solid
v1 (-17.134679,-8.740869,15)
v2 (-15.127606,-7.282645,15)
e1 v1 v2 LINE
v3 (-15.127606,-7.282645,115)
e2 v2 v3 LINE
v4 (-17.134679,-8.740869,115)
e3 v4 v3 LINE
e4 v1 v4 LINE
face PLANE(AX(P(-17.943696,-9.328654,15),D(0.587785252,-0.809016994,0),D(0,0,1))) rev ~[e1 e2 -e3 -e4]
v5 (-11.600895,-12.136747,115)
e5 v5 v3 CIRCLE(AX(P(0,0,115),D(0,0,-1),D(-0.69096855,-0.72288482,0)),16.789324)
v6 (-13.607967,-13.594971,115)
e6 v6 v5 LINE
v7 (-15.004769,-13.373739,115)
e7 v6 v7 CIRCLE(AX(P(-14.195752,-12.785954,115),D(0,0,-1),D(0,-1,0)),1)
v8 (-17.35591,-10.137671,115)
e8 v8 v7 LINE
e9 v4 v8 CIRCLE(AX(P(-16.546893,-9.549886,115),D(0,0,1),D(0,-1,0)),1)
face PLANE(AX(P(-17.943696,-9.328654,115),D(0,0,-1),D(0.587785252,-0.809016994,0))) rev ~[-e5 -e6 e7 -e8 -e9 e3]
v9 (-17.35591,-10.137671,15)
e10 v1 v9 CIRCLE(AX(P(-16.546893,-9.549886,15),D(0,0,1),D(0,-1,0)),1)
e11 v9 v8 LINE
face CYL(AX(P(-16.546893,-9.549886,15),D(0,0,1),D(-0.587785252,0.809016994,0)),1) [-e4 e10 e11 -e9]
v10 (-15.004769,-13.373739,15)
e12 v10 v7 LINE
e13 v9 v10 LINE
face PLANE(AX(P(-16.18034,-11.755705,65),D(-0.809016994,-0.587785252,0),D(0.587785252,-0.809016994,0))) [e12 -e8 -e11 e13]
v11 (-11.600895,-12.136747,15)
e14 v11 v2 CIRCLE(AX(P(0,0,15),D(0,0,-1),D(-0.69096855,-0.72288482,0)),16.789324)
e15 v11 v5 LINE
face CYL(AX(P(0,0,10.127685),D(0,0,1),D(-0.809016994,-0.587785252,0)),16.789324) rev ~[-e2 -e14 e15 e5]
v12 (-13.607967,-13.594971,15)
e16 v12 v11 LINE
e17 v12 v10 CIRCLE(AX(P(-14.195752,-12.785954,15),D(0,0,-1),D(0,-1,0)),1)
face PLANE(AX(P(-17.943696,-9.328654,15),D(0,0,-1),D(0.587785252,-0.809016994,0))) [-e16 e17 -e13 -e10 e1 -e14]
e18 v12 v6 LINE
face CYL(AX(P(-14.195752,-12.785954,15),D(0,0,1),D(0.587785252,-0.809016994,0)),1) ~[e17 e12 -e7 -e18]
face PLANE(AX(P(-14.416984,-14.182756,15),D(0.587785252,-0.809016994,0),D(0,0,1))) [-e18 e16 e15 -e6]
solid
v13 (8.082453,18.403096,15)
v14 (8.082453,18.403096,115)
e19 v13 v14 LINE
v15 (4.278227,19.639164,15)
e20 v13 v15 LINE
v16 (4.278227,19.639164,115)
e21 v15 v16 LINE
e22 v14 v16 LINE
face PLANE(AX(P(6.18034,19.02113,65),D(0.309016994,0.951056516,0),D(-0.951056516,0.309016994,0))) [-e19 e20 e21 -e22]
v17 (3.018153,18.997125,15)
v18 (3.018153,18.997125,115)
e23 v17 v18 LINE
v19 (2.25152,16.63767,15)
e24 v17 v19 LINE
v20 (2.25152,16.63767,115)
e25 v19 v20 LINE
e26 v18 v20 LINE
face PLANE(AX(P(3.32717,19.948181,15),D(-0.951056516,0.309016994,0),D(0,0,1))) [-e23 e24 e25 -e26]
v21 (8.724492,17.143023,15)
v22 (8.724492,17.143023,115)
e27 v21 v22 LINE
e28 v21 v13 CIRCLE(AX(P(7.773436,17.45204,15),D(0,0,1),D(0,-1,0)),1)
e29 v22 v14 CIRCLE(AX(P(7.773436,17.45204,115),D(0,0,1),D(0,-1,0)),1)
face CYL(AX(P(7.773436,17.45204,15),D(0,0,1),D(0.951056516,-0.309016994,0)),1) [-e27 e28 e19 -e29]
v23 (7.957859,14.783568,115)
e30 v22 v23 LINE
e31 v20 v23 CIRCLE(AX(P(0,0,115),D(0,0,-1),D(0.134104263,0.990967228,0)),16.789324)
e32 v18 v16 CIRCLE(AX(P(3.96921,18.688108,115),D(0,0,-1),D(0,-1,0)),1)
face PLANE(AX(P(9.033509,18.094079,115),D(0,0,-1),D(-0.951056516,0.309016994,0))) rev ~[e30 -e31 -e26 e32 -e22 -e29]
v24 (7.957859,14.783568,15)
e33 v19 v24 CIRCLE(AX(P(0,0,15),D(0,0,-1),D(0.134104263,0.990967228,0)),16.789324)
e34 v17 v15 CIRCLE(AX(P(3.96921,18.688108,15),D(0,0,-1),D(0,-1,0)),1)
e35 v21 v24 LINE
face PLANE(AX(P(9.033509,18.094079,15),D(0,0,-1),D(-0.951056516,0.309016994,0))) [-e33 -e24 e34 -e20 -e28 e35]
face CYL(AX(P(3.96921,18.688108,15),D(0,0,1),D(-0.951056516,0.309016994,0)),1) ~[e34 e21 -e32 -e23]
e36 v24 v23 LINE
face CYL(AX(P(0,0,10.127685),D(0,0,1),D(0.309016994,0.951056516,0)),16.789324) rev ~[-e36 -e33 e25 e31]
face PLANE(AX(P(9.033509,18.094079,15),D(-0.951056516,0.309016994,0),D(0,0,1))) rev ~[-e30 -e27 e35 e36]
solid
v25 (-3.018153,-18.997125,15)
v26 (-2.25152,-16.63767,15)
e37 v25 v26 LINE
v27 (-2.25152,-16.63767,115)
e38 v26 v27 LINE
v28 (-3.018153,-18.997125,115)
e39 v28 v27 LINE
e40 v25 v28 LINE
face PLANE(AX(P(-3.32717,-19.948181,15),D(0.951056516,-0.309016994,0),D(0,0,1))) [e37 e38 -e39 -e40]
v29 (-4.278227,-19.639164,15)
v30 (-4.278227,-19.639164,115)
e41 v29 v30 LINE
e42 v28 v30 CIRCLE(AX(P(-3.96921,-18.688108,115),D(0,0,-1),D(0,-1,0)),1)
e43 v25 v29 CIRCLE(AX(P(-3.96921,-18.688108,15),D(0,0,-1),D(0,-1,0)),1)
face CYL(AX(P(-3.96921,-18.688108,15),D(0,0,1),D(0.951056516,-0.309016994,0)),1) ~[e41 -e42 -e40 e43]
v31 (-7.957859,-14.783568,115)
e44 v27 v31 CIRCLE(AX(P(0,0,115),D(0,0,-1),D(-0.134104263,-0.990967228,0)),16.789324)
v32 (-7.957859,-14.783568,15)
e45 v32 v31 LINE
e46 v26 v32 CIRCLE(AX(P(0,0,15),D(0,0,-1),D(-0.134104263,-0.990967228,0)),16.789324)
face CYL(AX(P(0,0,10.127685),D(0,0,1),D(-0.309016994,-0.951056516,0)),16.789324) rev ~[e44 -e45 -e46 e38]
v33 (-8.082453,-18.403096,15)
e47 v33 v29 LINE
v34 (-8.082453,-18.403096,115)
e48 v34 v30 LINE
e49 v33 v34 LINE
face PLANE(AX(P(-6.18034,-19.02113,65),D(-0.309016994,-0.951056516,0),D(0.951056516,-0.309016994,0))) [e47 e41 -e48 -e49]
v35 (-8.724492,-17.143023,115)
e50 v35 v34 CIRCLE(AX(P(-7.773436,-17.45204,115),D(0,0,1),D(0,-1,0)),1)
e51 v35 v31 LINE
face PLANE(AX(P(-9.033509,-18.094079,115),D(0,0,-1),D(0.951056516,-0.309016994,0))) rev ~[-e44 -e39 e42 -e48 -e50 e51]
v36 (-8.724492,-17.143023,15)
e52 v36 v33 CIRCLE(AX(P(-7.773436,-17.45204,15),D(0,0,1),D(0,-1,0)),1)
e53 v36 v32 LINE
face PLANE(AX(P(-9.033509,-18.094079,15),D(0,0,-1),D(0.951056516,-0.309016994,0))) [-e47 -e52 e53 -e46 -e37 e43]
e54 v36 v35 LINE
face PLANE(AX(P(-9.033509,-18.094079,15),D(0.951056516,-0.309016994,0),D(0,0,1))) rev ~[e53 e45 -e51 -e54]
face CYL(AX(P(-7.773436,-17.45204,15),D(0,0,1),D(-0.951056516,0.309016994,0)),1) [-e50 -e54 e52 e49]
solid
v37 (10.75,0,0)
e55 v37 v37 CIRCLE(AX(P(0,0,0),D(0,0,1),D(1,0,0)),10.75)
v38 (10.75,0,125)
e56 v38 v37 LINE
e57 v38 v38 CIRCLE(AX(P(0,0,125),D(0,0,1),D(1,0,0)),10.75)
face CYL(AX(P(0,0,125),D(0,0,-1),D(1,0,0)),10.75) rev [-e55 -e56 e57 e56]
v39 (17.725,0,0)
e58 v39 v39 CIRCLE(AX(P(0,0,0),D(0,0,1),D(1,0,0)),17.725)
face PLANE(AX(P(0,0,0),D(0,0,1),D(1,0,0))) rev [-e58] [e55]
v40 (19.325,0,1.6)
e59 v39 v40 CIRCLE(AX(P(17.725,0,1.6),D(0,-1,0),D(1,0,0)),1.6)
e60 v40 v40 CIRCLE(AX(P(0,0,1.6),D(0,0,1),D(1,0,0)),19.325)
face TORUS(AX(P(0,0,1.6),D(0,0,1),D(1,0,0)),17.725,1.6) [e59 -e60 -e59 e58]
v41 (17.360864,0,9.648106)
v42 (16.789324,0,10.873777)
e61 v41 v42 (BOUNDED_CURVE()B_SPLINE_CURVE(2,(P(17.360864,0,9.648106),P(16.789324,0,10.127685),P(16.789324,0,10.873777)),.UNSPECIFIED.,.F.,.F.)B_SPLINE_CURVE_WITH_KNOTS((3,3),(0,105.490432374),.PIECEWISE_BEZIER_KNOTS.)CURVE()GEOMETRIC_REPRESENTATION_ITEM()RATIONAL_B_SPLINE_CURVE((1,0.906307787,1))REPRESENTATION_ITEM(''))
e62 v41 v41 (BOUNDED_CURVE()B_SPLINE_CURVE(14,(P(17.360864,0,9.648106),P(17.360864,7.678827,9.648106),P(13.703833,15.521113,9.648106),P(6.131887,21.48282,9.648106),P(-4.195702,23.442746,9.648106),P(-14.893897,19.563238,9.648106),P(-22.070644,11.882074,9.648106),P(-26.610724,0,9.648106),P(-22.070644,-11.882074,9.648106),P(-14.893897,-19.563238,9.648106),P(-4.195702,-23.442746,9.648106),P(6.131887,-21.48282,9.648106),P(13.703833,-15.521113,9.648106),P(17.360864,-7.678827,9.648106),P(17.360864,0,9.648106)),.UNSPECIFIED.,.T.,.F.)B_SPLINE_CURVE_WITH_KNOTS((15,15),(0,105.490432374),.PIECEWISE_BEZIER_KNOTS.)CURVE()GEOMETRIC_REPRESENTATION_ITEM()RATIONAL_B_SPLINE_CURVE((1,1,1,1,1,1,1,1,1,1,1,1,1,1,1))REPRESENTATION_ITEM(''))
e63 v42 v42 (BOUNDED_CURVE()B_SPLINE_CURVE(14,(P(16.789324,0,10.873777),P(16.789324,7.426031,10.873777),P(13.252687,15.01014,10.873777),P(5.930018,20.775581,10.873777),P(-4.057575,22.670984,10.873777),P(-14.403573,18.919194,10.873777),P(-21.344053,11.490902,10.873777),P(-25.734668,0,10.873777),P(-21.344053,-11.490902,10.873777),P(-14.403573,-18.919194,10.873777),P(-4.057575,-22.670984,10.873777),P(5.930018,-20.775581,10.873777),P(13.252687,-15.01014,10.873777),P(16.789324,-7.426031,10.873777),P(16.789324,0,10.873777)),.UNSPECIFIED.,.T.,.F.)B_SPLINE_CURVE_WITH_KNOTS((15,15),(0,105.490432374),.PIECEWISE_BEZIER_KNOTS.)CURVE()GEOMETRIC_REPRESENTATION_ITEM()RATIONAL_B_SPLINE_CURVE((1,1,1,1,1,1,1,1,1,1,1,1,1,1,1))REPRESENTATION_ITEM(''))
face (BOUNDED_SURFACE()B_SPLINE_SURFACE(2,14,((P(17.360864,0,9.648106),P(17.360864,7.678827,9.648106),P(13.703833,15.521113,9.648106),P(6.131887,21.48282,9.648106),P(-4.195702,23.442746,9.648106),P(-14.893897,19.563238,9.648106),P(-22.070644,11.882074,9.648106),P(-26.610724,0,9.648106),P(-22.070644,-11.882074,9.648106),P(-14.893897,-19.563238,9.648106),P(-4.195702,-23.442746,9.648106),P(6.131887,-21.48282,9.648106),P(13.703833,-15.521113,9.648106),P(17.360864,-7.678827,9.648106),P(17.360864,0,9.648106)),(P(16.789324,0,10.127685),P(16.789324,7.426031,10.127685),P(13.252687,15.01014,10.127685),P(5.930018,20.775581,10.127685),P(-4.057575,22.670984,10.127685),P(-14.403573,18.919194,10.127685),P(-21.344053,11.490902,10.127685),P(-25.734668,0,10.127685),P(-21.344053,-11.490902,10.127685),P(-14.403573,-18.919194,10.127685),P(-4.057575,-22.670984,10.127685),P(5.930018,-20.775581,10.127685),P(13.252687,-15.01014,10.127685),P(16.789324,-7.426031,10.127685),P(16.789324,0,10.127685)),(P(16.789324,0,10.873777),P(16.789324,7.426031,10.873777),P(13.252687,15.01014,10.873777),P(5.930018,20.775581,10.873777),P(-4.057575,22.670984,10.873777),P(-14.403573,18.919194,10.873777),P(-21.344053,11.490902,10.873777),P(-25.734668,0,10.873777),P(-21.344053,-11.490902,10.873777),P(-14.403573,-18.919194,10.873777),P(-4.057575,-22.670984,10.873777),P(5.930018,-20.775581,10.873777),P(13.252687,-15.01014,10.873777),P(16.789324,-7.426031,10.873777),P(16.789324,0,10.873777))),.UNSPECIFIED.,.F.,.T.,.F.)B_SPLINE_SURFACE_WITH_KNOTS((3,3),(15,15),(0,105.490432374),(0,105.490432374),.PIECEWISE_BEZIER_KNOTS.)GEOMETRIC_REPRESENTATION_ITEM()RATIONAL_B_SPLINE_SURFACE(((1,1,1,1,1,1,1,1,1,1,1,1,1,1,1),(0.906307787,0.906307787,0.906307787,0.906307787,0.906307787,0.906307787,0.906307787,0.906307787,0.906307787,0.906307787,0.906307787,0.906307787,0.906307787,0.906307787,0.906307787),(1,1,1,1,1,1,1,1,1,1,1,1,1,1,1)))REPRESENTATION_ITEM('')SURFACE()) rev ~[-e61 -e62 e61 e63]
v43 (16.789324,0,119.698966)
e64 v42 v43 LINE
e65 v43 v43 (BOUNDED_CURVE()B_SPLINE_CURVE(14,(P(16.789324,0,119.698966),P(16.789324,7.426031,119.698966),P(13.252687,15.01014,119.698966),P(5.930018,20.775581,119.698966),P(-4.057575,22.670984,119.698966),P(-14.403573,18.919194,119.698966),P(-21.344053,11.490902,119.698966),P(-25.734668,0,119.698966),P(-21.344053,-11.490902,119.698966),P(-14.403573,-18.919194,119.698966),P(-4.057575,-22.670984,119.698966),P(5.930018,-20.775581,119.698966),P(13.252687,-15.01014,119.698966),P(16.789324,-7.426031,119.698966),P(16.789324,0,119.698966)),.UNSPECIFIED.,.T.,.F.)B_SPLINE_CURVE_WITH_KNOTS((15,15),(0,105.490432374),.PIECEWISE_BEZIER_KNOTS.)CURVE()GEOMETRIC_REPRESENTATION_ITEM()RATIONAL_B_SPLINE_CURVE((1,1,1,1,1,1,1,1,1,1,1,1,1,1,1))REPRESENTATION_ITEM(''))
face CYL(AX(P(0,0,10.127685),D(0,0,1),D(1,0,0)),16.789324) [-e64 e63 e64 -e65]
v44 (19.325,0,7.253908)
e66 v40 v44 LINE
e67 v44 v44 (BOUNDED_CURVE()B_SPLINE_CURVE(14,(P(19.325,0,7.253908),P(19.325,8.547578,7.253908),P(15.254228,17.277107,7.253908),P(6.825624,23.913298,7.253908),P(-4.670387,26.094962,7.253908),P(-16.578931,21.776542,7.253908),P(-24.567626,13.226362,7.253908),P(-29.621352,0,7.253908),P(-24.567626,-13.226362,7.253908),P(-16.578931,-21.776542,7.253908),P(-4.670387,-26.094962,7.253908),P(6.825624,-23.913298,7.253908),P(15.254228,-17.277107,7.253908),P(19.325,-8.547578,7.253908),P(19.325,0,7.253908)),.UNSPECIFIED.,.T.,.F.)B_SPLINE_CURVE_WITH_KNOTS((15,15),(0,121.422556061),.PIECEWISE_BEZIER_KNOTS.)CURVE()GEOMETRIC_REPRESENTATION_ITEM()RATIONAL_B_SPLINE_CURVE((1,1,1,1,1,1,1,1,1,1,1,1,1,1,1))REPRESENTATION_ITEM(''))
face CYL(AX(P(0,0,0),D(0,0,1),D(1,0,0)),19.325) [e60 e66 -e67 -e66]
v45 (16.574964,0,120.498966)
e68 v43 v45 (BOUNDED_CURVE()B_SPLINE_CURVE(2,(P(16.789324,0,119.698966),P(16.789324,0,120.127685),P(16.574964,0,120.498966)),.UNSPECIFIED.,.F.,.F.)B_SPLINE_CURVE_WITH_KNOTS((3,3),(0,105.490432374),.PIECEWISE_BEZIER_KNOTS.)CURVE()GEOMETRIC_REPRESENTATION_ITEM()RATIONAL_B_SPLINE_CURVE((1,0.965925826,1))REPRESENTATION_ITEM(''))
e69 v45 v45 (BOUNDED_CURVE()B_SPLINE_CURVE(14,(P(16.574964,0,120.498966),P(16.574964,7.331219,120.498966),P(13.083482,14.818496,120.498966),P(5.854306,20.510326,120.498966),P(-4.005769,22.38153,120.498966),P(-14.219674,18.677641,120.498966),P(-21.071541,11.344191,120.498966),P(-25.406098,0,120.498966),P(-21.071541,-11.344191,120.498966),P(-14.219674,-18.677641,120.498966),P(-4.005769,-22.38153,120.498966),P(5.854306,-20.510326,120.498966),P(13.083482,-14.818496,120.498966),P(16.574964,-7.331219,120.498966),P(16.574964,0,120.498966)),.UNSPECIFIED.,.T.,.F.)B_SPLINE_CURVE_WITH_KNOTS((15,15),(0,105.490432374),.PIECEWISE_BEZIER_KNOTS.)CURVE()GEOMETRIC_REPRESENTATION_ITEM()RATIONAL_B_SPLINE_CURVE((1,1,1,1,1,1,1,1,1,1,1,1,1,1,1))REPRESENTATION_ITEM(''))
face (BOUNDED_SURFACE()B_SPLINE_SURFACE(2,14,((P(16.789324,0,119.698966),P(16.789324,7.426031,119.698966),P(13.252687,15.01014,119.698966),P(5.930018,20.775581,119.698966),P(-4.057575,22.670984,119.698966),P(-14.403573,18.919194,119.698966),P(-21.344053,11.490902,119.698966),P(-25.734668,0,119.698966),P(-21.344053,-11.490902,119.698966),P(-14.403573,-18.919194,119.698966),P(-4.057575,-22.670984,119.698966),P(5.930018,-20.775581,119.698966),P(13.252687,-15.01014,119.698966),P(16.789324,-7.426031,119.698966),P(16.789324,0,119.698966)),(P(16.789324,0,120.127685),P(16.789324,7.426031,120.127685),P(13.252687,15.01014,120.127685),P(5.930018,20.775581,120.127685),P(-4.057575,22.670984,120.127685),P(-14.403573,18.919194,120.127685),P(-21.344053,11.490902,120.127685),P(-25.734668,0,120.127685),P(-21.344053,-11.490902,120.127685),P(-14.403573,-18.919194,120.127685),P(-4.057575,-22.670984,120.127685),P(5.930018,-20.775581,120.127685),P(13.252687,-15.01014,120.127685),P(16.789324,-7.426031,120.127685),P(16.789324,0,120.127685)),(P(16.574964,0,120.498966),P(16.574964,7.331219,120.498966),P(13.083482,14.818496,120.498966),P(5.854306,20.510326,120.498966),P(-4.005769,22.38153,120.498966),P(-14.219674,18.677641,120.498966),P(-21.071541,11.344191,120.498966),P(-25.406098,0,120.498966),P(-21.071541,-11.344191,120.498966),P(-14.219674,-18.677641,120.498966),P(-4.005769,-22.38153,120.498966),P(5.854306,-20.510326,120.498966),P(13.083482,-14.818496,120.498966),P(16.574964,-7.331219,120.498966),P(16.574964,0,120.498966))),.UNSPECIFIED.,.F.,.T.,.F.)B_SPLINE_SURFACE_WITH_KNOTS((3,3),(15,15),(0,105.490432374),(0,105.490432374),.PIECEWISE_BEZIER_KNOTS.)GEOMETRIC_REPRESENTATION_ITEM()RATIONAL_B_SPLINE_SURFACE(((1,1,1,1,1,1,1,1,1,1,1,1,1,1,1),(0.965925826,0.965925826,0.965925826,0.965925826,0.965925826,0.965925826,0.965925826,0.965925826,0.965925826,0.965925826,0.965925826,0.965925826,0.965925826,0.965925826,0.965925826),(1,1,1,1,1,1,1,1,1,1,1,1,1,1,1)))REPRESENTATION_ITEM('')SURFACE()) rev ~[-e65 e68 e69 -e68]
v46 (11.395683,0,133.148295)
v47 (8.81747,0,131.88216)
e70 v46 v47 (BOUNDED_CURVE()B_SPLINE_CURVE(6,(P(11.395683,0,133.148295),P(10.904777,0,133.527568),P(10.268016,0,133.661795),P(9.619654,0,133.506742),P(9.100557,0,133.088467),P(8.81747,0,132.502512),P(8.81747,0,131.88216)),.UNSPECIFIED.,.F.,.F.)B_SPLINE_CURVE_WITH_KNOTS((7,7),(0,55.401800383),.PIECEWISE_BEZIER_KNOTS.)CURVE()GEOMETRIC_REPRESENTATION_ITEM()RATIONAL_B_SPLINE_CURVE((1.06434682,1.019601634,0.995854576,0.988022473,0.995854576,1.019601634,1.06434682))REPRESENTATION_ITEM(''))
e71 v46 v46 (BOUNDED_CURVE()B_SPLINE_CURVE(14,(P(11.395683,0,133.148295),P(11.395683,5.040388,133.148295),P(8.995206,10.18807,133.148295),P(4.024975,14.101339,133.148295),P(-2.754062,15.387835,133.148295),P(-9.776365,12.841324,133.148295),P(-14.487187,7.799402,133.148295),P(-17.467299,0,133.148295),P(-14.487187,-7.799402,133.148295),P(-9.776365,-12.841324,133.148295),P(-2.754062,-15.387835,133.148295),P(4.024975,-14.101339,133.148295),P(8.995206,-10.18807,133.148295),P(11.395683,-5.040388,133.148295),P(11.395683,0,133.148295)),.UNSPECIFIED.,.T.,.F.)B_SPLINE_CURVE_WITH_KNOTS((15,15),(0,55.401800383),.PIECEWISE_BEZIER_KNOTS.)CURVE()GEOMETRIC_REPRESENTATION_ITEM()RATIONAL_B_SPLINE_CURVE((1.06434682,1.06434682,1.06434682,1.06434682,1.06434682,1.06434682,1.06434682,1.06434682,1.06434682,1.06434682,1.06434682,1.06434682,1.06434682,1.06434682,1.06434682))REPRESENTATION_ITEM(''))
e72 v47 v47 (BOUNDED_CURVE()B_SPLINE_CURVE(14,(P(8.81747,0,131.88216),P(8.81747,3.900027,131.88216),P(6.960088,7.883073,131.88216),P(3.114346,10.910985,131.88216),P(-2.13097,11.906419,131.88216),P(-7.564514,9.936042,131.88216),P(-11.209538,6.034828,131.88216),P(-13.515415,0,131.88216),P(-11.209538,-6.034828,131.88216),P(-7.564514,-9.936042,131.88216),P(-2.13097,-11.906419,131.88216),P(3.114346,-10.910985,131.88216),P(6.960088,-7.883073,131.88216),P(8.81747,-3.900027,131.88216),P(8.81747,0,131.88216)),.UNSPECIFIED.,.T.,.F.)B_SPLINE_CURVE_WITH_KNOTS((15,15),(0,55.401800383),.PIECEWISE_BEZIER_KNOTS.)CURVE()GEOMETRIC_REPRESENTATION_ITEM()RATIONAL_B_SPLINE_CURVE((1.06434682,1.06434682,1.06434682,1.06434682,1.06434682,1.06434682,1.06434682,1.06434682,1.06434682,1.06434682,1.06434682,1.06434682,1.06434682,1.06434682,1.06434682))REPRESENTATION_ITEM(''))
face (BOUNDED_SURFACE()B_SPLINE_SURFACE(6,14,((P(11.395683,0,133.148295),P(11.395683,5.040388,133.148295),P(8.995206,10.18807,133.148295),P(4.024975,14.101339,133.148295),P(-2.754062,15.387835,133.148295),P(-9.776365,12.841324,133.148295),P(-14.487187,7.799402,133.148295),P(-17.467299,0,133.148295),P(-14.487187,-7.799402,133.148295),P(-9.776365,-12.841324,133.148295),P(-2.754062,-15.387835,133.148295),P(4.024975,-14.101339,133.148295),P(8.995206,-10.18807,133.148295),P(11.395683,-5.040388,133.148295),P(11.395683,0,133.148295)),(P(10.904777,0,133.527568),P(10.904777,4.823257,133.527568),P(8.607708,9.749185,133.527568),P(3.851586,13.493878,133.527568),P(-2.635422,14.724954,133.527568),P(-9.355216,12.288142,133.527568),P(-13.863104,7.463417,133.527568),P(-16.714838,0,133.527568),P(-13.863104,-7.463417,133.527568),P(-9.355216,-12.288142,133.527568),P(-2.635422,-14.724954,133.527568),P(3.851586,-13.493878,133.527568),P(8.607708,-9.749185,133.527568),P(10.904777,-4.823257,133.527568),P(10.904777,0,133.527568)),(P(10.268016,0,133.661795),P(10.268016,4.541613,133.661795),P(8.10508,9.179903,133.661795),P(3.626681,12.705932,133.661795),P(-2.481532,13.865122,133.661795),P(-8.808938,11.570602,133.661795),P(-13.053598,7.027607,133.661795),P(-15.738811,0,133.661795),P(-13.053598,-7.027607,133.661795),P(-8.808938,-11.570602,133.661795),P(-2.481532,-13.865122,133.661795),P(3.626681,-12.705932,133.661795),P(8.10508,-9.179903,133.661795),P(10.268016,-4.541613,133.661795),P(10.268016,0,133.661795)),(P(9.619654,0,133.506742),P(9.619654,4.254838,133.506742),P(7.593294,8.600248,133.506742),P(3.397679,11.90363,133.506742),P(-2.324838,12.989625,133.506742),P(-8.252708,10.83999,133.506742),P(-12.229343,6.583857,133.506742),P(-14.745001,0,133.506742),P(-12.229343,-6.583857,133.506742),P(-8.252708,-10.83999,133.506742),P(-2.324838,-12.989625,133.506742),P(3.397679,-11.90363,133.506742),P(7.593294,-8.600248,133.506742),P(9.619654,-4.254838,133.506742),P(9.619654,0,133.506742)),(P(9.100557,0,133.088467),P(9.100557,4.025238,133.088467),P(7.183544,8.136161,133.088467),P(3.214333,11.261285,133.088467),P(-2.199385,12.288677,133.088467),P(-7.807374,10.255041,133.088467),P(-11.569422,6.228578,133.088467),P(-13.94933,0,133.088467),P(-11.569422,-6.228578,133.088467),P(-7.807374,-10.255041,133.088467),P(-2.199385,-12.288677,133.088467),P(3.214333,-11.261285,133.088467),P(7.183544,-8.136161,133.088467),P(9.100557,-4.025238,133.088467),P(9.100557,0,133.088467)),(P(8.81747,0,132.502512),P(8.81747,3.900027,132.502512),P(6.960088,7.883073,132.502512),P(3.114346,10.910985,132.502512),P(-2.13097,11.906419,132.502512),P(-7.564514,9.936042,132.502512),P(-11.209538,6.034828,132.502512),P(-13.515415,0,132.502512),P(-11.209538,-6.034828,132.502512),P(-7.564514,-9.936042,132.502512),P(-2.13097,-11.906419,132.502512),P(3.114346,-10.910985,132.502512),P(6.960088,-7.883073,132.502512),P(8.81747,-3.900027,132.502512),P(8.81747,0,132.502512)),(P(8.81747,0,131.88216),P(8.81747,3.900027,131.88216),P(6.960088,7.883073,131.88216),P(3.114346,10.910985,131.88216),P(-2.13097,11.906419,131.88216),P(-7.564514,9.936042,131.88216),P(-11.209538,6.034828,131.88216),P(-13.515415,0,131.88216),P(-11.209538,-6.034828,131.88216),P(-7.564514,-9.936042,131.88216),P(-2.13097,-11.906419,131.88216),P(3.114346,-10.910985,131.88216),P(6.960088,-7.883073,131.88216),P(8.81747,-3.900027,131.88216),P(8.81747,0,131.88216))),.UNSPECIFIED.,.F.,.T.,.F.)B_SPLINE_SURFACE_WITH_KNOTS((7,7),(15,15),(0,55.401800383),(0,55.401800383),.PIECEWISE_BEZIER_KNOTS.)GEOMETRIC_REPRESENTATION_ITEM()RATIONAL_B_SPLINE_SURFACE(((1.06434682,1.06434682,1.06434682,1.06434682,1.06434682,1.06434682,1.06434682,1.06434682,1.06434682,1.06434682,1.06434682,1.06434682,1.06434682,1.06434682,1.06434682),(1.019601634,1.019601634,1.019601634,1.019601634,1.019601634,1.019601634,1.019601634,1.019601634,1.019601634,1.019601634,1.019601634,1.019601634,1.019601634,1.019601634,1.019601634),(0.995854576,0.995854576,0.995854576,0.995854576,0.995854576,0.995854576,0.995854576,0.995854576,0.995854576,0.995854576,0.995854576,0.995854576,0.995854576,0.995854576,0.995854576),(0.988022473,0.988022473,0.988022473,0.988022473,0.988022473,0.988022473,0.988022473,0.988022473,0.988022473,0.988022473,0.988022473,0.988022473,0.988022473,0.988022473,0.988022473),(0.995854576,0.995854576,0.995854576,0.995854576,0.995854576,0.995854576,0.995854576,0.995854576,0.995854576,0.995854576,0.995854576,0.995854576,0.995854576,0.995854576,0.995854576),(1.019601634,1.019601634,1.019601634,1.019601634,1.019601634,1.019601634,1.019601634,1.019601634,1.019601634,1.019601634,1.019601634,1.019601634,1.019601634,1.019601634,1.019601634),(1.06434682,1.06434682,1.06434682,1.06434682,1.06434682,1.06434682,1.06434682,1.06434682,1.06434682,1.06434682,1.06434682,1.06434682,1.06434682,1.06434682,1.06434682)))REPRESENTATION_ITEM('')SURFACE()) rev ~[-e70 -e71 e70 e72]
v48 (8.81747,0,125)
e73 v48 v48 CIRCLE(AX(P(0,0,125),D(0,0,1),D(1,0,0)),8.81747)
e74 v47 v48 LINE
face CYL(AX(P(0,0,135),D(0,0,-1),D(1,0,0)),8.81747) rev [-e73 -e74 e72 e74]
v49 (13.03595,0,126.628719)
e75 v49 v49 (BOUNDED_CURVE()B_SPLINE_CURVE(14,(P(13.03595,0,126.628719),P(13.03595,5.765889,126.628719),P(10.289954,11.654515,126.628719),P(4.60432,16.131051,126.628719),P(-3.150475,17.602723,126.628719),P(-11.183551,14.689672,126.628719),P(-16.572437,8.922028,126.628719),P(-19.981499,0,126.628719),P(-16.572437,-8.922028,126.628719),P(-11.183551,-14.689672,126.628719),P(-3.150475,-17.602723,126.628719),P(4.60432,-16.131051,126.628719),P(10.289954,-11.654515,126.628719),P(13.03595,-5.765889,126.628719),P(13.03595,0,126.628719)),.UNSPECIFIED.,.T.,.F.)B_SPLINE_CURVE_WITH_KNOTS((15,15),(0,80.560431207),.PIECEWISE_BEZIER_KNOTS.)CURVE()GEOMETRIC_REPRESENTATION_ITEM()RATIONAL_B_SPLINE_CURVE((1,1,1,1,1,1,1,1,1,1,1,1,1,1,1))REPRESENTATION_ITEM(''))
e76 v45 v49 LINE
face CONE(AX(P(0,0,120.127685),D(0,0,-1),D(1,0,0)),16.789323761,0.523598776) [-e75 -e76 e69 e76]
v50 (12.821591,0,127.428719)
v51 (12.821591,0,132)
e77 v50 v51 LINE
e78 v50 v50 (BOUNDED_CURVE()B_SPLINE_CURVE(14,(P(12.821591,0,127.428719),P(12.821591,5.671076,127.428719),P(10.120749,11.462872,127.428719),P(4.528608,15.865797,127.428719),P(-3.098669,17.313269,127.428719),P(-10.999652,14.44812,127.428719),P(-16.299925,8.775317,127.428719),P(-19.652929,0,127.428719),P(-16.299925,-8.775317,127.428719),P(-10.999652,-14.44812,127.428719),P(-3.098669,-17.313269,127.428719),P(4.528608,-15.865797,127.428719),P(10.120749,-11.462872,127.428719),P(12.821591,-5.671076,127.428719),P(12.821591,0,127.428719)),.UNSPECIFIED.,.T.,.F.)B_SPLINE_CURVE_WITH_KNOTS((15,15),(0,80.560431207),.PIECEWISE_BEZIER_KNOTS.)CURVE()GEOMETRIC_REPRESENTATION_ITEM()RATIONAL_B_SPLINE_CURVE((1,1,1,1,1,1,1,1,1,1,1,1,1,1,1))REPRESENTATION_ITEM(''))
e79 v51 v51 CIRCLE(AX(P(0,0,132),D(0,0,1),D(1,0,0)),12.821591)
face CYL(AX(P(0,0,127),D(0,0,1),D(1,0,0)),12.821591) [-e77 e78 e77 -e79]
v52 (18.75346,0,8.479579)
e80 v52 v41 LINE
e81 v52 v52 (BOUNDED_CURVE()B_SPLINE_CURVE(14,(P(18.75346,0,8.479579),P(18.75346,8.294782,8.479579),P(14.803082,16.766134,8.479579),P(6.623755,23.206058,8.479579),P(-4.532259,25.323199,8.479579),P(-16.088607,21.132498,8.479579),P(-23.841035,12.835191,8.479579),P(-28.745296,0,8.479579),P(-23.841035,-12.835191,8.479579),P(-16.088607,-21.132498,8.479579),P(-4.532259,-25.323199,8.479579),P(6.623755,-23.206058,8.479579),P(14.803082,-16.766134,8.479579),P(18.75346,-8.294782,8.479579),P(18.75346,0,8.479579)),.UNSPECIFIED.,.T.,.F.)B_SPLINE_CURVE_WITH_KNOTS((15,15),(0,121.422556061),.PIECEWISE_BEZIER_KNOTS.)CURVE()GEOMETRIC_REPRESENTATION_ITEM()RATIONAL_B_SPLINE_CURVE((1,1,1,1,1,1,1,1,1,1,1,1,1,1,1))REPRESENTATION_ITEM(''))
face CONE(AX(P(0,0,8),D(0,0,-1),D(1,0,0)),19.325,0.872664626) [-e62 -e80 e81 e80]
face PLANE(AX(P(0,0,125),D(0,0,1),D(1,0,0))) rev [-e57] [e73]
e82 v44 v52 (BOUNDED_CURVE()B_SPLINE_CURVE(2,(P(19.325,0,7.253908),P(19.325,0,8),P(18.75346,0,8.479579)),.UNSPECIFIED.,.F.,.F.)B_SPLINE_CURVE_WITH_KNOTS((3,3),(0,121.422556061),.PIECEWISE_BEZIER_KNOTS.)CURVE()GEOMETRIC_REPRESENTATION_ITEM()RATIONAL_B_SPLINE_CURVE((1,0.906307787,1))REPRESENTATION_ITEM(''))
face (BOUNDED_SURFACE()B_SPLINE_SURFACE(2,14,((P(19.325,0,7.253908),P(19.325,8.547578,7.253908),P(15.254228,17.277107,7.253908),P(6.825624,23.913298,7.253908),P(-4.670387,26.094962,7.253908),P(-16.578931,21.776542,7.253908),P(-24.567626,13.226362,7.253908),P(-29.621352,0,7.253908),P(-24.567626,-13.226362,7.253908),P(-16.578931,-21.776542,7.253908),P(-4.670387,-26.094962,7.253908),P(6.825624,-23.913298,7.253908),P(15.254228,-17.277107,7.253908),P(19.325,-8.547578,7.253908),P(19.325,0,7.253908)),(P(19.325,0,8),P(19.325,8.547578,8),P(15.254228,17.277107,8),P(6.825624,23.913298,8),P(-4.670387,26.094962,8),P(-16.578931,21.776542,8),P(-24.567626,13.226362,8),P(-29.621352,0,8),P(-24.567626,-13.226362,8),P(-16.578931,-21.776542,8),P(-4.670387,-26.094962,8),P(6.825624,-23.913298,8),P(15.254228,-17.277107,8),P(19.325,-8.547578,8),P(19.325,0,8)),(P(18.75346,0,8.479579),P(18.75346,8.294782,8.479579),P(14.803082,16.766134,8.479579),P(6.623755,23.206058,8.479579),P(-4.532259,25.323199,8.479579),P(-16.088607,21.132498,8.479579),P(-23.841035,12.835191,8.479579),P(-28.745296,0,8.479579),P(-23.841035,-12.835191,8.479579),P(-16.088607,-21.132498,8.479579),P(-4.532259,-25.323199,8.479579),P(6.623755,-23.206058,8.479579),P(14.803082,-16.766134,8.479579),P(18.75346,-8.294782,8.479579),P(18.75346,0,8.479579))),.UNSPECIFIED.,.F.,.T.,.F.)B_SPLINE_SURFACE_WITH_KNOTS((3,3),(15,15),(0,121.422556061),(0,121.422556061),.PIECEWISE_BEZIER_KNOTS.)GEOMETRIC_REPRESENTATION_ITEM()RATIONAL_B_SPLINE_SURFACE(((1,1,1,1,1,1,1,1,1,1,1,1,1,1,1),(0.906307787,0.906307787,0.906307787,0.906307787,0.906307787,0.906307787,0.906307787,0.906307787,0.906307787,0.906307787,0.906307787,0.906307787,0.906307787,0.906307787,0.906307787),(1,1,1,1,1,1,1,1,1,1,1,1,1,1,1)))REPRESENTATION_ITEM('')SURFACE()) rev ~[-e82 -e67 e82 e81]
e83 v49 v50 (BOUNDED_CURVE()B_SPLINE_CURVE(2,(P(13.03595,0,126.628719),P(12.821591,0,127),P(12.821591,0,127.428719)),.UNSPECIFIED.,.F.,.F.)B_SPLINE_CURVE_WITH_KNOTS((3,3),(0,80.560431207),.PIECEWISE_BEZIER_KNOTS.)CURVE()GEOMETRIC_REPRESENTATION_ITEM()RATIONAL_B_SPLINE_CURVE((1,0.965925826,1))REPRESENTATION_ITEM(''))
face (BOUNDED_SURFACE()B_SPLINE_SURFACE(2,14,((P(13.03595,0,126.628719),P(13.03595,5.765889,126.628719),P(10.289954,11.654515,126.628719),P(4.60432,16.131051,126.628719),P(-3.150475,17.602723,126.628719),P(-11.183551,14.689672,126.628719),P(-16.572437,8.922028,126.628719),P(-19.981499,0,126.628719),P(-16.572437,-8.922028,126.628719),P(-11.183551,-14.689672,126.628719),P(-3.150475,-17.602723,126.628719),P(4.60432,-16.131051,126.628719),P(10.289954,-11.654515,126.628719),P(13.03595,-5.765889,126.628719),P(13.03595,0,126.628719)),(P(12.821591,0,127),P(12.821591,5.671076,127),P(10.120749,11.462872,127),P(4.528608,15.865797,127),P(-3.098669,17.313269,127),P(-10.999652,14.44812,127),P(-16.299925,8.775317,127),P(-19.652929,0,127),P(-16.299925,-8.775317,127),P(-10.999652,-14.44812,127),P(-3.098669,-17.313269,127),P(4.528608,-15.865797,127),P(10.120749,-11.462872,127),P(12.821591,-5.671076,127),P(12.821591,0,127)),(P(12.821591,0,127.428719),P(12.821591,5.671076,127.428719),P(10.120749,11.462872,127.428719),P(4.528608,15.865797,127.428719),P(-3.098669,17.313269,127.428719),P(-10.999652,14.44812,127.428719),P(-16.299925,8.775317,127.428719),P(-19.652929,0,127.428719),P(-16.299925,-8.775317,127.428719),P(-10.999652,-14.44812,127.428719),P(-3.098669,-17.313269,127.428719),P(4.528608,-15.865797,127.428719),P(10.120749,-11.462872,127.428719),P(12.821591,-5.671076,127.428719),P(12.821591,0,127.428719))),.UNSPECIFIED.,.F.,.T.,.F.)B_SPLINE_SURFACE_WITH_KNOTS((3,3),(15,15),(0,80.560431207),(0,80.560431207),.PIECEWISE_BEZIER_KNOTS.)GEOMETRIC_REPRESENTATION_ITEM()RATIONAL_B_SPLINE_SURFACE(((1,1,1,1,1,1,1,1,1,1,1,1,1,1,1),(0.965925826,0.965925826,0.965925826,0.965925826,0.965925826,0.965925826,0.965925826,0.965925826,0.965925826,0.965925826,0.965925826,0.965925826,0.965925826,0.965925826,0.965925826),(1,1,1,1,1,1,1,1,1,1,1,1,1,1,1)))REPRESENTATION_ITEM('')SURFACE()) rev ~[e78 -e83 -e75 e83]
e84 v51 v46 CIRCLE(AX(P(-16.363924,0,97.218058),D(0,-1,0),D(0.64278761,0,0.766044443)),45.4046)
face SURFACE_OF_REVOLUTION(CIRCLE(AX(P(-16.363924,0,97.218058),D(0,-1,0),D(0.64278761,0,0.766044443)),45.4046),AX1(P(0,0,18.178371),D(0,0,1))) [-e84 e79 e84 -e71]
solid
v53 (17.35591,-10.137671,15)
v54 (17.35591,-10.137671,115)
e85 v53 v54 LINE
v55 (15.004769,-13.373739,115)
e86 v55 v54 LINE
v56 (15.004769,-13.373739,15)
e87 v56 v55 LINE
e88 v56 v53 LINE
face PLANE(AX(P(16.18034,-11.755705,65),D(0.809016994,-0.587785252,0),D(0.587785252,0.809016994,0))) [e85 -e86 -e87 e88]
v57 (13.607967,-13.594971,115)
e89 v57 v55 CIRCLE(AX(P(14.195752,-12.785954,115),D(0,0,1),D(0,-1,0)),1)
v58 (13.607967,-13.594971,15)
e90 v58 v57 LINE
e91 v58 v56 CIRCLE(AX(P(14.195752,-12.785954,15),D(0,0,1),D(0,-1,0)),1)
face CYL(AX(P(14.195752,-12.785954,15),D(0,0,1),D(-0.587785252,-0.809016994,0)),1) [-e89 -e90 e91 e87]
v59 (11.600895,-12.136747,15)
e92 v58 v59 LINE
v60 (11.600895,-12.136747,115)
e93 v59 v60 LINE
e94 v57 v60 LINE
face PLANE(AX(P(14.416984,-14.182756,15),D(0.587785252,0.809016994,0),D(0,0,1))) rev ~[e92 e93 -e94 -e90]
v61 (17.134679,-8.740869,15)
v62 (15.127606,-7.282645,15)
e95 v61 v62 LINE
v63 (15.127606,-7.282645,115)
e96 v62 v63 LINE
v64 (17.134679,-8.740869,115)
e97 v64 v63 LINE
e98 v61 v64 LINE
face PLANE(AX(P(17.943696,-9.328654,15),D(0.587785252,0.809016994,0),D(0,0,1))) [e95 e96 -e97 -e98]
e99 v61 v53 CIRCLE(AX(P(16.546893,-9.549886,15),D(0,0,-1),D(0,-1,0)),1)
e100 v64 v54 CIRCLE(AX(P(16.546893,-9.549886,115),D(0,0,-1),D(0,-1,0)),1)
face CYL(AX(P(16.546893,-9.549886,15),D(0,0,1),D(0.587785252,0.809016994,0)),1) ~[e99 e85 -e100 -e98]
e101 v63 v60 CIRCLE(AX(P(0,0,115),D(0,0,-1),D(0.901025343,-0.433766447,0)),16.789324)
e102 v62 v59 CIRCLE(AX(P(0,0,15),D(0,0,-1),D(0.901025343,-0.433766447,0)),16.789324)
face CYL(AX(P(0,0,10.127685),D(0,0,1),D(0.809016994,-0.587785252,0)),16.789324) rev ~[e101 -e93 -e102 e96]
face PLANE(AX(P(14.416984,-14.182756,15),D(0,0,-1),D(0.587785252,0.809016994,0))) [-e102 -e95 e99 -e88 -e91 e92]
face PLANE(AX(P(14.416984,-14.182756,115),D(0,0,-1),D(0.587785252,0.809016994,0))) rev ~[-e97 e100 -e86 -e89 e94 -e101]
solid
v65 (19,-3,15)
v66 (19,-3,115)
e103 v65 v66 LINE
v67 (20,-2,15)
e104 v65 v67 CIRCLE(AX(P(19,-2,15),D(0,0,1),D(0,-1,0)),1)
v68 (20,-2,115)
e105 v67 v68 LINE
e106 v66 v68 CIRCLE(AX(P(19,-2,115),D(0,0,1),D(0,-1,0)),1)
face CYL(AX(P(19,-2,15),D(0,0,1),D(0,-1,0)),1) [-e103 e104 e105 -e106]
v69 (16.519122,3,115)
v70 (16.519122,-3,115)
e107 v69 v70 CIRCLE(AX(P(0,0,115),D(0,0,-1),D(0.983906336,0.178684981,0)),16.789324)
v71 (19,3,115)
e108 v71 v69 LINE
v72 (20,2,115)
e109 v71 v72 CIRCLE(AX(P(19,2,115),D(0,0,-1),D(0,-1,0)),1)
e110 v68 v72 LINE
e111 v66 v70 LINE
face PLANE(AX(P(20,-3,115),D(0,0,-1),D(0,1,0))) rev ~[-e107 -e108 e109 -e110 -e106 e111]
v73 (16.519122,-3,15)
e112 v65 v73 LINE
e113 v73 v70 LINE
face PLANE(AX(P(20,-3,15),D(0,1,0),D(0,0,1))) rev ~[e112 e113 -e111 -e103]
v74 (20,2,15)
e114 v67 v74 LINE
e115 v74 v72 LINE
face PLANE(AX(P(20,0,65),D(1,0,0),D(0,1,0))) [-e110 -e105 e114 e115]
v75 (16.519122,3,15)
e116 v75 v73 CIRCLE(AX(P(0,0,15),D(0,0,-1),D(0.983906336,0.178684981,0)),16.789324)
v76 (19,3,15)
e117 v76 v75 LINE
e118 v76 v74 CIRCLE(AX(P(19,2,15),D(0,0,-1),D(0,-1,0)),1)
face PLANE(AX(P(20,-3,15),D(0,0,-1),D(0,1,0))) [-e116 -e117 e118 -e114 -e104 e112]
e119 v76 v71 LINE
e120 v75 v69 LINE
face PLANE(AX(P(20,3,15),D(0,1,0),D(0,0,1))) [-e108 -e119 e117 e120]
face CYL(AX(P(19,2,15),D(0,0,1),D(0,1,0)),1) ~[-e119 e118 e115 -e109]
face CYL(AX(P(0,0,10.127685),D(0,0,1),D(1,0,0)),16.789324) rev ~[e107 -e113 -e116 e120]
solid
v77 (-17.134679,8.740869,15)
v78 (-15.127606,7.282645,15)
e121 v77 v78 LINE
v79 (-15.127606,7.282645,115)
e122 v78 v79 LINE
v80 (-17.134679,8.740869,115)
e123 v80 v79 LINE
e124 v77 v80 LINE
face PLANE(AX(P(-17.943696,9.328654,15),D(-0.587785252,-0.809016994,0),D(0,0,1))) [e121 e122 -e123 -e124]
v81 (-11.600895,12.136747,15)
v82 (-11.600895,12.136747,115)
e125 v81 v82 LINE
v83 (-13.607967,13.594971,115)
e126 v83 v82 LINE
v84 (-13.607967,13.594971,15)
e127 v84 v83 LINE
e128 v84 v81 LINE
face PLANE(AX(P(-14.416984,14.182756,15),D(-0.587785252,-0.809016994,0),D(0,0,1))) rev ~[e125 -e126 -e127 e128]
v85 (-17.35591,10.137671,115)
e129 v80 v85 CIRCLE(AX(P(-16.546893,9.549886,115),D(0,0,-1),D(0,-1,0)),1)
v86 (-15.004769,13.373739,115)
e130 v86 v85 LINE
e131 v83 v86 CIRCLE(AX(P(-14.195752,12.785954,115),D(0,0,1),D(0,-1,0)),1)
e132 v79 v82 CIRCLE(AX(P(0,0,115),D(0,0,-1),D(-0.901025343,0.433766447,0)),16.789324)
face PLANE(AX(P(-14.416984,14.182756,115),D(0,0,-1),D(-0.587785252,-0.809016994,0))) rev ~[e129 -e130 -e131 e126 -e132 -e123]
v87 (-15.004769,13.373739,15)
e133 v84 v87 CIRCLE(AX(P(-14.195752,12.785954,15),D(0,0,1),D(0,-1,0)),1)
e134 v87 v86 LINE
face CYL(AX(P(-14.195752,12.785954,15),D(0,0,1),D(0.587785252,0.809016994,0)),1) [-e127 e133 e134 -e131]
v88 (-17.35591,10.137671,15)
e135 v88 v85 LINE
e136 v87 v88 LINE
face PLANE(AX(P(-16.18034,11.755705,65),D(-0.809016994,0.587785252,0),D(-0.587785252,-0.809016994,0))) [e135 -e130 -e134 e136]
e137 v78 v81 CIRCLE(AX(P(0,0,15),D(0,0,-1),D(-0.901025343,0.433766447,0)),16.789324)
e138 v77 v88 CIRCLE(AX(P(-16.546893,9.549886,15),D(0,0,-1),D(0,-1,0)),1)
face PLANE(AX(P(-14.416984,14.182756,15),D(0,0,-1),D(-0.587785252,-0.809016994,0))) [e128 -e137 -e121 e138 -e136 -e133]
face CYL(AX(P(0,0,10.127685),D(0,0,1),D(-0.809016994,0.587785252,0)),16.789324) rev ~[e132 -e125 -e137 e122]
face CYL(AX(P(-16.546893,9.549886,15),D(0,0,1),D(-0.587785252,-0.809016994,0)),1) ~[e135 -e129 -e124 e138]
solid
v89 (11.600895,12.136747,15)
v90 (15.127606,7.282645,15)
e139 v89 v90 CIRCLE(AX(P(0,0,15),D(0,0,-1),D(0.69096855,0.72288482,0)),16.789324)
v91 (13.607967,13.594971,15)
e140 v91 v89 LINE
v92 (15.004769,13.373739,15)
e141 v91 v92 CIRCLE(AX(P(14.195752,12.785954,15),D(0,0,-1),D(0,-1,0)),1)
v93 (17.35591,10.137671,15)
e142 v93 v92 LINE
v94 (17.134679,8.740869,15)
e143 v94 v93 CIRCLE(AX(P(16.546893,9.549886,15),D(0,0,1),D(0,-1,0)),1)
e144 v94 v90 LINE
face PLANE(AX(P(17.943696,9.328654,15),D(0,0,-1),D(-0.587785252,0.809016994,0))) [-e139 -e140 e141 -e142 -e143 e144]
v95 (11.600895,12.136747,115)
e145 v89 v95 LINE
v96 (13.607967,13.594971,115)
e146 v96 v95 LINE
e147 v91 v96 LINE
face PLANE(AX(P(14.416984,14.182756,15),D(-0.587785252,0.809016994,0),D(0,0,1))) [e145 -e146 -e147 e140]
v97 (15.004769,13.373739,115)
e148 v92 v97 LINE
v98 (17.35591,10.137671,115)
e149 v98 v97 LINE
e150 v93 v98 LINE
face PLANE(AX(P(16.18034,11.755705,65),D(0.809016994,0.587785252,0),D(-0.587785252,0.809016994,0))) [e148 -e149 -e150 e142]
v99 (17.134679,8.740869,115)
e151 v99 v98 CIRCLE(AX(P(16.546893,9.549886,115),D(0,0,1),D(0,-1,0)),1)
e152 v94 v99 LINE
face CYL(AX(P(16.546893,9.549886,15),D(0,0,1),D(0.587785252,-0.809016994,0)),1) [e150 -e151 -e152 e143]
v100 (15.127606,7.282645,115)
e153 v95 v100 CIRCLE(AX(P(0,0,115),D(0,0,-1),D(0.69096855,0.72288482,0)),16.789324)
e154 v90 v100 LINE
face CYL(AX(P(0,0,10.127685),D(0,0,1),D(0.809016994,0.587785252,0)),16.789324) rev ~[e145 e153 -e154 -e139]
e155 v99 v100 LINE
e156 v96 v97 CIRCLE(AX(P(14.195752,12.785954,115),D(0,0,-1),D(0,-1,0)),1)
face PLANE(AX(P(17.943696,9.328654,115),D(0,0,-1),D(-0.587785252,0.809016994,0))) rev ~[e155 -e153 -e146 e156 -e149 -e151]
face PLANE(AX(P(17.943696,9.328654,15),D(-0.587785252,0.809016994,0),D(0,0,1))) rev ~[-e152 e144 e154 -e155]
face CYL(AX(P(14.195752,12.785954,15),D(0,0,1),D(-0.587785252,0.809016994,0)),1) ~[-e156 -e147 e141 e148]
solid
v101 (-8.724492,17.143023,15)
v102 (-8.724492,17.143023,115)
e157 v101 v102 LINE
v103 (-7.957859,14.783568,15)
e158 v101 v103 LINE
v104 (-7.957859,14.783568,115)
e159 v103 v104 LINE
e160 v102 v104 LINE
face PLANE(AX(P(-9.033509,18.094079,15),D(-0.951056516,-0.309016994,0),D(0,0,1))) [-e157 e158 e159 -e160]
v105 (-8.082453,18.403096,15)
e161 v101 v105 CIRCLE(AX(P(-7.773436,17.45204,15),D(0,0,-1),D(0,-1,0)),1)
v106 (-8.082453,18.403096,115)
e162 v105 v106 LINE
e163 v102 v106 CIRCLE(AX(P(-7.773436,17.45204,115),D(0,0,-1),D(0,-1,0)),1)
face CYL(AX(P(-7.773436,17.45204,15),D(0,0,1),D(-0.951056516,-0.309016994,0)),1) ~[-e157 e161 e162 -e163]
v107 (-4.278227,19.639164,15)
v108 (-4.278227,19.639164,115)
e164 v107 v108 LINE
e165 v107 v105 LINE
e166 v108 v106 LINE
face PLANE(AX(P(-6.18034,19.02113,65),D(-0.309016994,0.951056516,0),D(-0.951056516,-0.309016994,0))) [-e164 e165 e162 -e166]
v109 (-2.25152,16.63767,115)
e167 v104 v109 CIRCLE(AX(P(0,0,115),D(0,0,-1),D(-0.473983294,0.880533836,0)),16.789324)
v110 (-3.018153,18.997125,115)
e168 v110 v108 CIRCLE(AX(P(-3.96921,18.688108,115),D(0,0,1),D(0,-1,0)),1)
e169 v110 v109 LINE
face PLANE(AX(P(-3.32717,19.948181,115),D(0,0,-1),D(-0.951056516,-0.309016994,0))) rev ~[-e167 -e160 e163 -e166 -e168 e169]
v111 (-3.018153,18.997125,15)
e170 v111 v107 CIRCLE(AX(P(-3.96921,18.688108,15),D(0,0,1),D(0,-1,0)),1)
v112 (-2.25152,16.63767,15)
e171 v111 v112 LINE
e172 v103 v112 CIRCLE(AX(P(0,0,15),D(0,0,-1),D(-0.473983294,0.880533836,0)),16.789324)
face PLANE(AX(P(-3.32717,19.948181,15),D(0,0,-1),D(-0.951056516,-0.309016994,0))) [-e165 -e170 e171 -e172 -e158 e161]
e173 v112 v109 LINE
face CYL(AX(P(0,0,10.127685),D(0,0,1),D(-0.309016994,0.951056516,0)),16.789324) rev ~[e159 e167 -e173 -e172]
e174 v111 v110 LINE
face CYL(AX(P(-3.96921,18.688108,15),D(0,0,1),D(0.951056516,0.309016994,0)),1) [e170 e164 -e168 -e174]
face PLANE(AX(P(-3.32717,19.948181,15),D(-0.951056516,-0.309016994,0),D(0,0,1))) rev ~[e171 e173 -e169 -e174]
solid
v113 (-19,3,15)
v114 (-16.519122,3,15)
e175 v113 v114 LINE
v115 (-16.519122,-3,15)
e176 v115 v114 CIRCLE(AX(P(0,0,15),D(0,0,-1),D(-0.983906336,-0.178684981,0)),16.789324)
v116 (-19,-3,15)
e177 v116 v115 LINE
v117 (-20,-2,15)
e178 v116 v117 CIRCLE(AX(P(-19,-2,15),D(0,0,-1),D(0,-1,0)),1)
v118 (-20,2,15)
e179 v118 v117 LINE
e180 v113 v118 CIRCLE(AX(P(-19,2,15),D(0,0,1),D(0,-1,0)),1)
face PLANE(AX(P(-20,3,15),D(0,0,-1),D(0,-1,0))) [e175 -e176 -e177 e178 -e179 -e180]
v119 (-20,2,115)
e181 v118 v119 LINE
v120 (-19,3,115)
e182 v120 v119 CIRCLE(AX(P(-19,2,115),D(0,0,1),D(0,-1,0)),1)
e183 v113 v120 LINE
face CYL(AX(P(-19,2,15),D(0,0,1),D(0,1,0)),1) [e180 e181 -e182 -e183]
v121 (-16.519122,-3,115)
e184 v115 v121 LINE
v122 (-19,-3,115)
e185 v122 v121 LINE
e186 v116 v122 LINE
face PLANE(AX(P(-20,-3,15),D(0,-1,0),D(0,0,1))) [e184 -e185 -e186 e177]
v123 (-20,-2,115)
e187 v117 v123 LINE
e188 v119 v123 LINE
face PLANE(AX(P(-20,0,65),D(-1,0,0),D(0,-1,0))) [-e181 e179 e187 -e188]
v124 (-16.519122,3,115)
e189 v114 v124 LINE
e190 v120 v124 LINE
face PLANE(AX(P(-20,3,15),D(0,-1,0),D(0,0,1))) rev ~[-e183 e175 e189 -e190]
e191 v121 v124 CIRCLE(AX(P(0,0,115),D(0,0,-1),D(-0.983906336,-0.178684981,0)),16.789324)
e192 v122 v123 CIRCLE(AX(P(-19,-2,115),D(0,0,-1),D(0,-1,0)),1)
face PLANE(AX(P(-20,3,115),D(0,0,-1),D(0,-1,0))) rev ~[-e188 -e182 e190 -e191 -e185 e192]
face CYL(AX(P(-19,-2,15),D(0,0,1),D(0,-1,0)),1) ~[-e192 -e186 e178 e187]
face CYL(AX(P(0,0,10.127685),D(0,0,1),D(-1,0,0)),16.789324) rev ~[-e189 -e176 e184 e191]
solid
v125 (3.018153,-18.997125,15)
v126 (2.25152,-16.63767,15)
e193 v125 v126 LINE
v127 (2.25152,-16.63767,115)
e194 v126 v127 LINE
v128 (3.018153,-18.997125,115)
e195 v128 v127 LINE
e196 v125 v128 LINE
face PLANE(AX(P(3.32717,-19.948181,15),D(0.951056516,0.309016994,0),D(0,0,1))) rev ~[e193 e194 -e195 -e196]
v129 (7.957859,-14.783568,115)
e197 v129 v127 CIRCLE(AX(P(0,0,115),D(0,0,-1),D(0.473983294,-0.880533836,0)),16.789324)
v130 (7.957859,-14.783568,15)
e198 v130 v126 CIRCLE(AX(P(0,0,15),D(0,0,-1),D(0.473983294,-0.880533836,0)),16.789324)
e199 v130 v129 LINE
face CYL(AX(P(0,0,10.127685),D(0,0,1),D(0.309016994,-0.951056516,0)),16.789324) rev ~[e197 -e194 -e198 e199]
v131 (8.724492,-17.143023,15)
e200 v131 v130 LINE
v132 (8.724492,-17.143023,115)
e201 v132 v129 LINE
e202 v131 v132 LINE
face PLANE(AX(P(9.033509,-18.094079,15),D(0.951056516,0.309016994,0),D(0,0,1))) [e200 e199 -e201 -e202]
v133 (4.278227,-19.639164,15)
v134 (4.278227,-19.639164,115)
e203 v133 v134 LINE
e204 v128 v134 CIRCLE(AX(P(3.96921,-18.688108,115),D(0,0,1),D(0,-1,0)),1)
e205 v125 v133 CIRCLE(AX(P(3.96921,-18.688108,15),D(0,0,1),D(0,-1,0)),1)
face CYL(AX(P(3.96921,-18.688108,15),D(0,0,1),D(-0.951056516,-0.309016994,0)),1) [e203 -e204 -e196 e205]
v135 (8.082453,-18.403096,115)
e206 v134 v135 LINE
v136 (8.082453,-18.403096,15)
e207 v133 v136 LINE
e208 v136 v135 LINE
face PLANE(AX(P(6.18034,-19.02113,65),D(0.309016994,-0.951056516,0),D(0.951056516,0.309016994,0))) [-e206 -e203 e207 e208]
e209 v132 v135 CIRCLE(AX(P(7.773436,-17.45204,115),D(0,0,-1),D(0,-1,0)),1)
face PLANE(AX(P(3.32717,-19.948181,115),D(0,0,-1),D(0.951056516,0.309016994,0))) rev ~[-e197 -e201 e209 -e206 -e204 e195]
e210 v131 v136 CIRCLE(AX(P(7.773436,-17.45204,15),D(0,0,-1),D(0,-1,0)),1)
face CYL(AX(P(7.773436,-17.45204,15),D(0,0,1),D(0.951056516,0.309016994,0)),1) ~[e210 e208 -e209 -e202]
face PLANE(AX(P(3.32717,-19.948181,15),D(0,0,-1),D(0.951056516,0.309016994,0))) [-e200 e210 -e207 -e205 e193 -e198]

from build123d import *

# Parameters (mm, degrees)
F2_R            = 1.6
F4_W            = 6
F4_H            = 100
F5_COPIES_COUNT = 10
F6_R            = 1
F6_2_R          = 1
F6_3_R          = 1
F6_4_R          = 1
F6_5_R          = 1
F6_6_R          = 1
F6_7_R          = 1
F6_8_R          = 1
F6_9_R          = 1
F6_10_R         = 1


# Not quite as in the source:
# - a feature of the source that left no trace in its solid (it failed there, or was rolled back) is left out
# - a pattern or mirror of a feature is missing from the dataset's text; its kind, count and spacing are read off the source's solid


with BuildPart() as f1:
    # F0 (on Front) → F1 (revolve)
    with BuildSketch(Plane.XZ):
        with BuildLine():
            Line((10.75, 125), (10.75, 0))
            Line((10.75, 0), (19.325, 0))
            Line((19.325, 0), (19.325, 8))
            Line((19.325, 8), (16.7893237613, 10.1276849967))
            Line((16.7893237613, 10.1276849967), (16.7893237613, 120.1276849967))
            Line((16.7893237613, 120.1276849967), (12.8215908442, 127))
            Line((12.8215908442, 127), (12.8215908442, 132))
            ThreePointArc((12.8215908442, 132), (10.860884629, 133.5551954835), (8.8174703872, 135))
            Line((8.8174703872, 135), (8.8174703872, 125))
            Line((8.8174703872, 125), (10.75, 125))
        make_face()
    revolve(axis=Axis((0, 0, 18.1783709021), (0, 0, 1)))

    # F2
    f2_edges = [f1.edges().sort_by_distance(p)[0] for p in [
        (-8.81747, 0, 135),
        (-12.821591, 0, 127),
        (-16.789324, 0, 120.127685),
        (-16.789324, 0, 10.127685),
        (-19.325, 0, 8),
        (-19.325, 0, 0),
    ]]
    fillet(f2_edges, radius=F2_R)


with BuildPart() as f5:
    # F4 (on offset) → F5 (new body, up to the next surface of F1)
    with BuildSketch(Plane.YZ.offset(20)):
        with Locations((0, 65)):
            Rectangle(F4_W, F4_H)
    extrude(until=Until.NEXT, target=f1.part, dir=(-1, 0, 0))


with BuildPart() as f5_copies_1:
    # F5_copies: instance of F5
    add(f5.part.rotate(Axis((0, 0, 0), (0, 0, 1)), 1 * 360 / F5_COPIES_COUNT))

    # F6#2
    f6_2_edges = [f5_copies_1.edges().sort_by_distance(p)[0] for p in [
        (17.943696, 9.328654, 65),
        (14.416984, 14.182756, 65),
    ]]
    fillet(f6_2_edges, radius=F6_2_R)


with BuildPart() as f5_copies_2:
    # F5_copies: instance of F5
    add(f5.part.rotate(Axis((0, 0, 0), (0, 0, 1)), 2 * 360 / F5_COPIES_COUNT))

    # F6#3
    f6_3_edges = [f5_copies_2.edges().sort_by_distance(p)[0] for p in [
        (9.033509, 18.094079, 65),
        (3.32717, 19.948181, 65),
    ]]
    fillet(f6_3_edges, radius=F6_3_R)


with BuildPart() as f5_copies_3:
    # F5_copies: instance of F5
    add(f5.part.rotate(Axis((0, 0, 0), (0, 0, 1)), 3 * 360 / F5_COPIES_COUNT))

    # F6#4
    f6_4_edges = [f5_copies_3.edges().sort_by_distance(p)[0] for p in [
        (-3.32717, 19.948181, 65),
        (-9.033509, 18.094079, 65),
    ]]
    fillet(f6_4_edges, radius=F6_4_R)


with BuildPart() as f5_copies_4:
    # F5_copies: instance of F5
    add(f5.part.rotate(Axis((0, 0, 0), (0, 0, 1)), 4 * 360 / F5_COPIES_COUNT))

    # F6#5
    f6_5_edges = [f5_copies_4.edges().sort_by_distance(p)[0] for p in [
        (-14.416984, 14.182756, 65),
        (-17.943696, 9.328654, 65),
    ]]
    fillet(f6_5_edges, radius=F6_5_R)


with BuildPart() as f5_copies_5:
    # F5_copies: instance of F5
    add(f5.part.rotate(Axis((0, 0, 0), (0, 0, 1)), 5 * 360 / F5_COPIES_COUNT))

    # F6#6
    f6_6_edges = [f5_copies_5.edges().sort_by_distance(p)[0] for p in [
        (-20, 3, 65),
        (-20, -3, 65),
    ]]
    fillet(f6_6_edges, radius=F6_6_R)


with BuildPart() as f5_copies_6:
    # F5_copies: instance of F5
    add(f5.part.rotate(Axis((0, 0, 0), (0, 0, 1)), 6 * 360 / F5_COPIES_COUNT))

    # F6#7
    f6_7_edges = [f5_copies_6.edges().sort_by_distance(p)[0] for p in [
        (-17.943696, -9.328654, 65),
        (-14.416984, -14.182756, 65),
    ]]
    fillet(f6_7_edges, radius=F6_7_R)


with BuildPart() as f5_copies_7:
    # F5_copies: instance of F5
    add(f5.part.rotate(Axis((0, 0, 0), (0, 0, 1)), 7 * 360 / F5_COPIES_COUNT))

    # F6#8
    f6_8_edges = [f5_copies_7.edges().sort_by_distance(p)[0] for p in [
        (-9.033509, -18.094079, 65),
        (-3.32717, -19.948181, 65),
    ]]
    fillet(f6_8_edges, radius=F6_8_R)


with BuildPart() as f5_copies_8:
    # F5_copies: instance of F5
    add(f5.part.rotate(Axis((0, 0, 0), (0, 0, 1)), 8 * 360 / F5_COPIES_COUNT))

    # F6#9
    f6_9_edges = [f5_copies_8.edges().sort_by_distance(p)[0] for p in [
        (3.32717, -19.948181, 65),
        (9.033509, -18.094079, 65),
    ]]
    fillet(f6_9_edges, radius=F6_9_R)


with BuildPart() as f5_copies_9:
    # F5_copies: instance of F5
    add(f5.part.rotate(Axis((0, 0, 0), (0, 0, 1)), 9 * 360 / F5_COPIES_COUNT))

    # F6#10
    f6_10_edges = [f5_copies_9.edges().sort_by_distance(p)[0] for p in [
        (14.416984, -14.182756, 65),
        (17.943696, -9.328654, 65),
    ]]
    fillet(f6_10_edges, radius=F6_10_R)


with BuildPart() as f5_1:
    add(f5.part)

    # F6
    f6_edges = [f5_1.edges().sort_by_distance(p)[0] for p in [
        (20, -3, 65),
        (20, 3, 65),
    ]]
    fillet(f6_edges, radius=F6_R)


solid = Compound([f1.part, f5_copies_1.part, f5_copies_2.part, f5_copies_3.part, f5_copies_4.part, f5_copies_5.part, f5_copies_6.part, f5_copies_7.part, f5_copies_8.part, f5_copies_9.part, f5_1.part])
